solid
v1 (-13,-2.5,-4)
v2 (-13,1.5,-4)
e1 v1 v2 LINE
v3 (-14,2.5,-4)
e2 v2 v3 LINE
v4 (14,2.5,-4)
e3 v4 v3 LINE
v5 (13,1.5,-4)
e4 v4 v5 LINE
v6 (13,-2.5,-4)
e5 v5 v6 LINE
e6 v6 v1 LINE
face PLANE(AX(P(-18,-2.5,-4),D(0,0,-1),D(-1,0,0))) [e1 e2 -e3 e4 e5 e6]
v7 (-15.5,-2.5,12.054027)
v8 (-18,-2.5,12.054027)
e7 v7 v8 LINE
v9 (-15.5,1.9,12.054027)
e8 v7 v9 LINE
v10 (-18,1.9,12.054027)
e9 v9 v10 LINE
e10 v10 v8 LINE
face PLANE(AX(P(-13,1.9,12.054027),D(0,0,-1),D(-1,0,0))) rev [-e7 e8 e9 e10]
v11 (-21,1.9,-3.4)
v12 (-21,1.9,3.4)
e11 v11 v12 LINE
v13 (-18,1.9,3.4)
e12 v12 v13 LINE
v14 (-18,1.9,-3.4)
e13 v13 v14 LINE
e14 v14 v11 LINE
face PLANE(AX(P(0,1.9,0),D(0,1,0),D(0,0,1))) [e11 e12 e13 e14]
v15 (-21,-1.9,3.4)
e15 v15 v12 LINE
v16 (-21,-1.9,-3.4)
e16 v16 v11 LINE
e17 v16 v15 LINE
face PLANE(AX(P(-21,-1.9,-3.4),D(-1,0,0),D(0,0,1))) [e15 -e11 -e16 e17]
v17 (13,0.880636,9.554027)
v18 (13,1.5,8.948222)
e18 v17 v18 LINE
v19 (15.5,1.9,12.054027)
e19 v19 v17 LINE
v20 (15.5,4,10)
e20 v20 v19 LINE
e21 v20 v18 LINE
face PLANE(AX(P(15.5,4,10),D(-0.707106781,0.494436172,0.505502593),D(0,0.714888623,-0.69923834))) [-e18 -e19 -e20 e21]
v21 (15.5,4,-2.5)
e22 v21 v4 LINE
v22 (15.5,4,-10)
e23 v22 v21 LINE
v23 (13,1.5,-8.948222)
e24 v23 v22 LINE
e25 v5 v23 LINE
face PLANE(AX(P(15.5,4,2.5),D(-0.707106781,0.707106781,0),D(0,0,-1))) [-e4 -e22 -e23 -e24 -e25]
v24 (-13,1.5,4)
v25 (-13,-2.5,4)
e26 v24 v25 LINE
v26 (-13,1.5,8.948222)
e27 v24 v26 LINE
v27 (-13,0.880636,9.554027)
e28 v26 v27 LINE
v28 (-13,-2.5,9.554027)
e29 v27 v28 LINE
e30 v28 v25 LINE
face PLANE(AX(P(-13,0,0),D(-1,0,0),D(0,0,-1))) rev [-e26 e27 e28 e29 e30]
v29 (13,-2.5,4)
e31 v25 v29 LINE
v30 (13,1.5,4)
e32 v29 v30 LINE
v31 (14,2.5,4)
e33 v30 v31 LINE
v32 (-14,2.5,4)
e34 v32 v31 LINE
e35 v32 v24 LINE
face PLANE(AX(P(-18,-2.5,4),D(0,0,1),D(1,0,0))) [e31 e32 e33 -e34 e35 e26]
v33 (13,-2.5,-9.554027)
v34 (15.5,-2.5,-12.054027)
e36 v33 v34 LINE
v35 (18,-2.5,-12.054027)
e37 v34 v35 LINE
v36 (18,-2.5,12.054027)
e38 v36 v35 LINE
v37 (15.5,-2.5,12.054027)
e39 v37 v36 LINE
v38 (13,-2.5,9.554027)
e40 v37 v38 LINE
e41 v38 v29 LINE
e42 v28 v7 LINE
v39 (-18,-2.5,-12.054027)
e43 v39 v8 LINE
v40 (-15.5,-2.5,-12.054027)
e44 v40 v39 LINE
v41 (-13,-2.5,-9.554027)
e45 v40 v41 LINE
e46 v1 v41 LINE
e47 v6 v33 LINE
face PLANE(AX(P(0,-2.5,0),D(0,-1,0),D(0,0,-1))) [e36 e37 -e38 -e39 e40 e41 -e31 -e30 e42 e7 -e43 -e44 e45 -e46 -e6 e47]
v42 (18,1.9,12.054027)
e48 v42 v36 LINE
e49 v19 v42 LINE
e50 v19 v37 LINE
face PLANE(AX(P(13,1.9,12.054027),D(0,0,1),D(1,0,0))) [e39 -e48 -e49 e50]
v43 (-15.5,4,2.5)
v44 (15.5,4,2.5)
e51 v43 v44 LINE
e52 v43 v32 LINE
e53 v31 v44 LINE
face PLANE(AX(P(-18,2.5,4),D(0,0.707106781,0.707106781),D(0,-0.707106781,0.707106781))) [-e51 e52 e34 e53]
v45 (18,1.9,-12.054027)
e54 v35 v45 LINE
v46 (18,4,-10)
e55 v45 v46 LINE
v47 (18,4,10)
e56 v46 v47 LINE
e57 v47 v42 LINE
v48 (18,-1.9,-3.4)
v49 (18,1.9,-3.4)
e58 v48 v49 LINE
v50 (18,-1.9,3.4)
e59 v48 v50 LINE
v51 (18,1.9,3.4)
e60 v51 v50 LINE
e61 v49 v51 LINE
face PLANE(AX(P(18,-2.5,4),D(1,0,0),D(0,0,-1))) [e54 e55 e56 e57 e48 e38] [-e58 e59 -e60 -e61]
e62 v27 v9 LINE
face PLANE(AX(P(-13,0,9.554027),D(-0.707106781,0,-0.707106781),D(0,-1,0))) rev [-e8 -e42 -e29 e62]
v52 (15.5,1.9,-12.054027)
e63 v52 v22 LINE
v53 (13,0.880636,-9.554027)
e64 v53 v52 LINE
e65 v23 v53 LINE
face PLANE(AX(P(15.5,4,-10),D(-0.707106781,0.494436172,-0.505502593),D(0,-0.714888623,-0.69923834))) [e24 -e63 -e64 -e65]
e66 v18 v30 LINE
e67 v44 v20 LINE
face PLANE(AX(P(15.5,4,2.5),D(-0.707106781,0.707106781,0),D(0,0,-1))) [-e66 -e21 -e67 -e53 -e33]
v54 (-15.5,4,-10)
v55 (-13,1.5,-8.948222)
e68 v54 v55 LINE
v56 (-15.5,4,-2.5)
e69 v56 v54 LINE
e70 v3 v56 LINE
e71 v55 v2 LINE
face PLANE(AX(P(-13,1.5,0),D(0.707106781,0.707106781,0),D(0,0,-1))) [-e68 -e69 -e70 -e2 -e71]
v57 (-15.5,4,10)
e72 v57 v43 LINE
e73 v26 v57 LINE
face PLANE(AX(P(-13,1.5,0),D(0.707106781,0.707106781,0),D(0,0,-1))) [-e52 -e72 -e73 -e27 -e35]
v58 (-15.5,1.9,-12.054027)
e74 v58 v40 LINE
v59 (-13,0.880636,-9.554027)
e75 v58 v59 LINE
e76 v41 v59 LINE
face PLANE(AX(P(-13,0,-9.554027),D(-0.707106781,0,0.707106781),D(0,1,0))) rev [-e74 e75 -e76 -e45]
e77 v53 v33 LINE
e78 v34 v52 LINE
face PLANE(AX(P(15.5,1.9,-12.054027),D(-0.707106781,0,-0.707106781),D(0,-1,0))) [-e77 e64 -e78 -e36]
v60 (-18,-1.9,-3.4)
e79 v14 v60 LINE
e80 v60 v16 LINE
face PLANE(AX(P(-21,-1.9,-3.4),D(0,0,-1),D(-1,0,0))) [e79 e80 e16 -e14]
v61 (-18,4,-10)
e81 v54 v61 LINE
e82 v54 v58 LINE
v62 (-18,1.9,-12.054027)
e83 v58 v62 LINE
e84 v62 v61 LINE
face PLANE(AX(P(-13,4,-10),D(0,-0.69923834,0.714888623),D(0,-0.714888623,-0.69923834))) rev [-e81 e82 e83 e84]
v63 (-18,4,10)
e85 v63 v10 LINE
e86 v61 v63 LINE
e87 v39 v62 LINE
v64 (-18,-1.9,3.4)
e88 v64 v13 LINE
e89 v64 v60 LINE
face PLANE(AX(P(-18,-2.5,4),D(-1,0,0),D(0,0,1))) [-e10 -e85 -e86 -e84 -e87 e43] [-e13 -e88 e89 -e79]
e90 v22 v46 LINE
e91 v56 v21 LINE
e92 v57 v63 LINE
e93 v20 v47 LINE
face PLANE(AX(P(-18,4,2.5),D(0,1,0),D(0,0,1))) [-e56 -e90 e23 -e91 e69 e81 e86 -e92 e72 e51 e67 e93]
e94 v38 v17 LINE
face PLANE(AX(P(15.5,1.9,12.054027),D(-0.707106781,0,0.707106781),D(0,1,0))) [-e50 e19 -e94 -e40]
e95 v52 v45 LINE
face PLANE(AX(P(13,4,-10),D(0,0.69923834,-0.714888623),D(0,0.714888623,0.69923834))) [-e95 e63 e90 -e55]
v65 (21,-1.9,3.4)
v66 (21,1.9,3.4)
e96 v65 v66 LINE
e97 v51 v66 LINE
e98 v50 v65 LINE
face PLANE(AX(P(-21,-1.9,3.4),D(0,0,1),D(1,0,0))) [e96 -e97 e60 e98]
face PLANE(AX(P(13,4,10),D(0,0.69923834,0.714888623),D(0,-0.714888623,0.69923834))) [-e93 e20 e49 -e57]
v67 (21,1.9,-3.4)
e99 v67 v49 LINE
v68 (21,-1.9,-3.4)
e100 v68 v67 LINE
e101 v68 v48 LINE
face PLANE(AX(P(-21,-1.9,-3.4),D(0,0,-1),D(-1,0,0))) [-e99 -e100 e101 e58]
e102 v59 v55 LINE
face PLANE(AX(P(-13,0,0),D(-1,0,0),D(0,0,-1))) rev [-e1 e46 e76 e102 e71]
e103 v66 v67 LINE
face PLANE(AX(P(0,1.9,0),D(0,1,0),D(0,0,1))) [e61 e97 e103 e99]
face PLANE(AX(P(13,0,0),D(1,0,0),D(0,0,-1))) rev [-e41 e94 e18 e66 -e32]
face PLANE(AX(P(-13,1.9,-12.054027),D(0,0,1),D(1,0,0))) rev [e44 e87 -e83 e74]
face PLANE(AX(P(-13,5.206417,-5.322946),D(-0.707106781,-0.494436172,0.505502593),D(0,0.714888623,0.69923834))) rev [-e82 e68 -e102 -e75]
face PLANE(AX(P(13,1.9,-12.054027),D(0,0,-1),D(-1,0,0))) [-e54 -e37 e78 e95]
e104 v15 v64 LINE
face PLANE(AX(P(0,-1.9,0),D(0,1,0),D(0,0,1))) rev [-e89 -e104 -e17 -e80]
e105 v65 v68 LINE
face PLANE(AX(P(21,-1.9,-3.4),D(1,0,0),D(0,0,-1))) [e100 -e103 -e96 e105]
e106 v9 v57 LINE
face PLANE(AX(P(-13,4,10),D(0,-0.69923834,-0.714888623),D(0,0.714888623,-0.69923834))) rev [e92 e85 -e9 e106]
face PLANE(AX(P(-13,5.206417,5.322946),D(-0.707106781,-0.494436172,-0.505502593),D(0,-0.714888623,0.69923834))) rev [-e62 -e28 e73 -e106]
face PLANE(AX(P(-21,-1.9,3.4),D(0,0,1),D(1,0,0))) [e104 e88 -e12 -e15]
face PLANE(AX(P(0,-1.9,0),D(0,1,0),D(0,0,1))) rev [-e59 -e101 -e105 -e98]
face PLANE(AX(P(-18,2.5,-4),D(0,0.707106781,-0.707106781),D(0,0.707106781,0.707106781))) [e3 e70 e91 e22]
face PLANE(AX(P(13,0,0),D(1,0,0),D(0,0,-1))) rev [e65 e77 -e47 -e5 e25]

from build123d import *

# Parameters (mm, degrees)
BOSS_EXTRUDE1_DEPTH      = 2.5
BOSS_EXTRUDE1_DEPTH_BACK = 2.5
SKETCH1_W                = 36
SKETCH1_H                = 8
BOSS_EXTRUDE2_DEPTH      = 1.9
BOSS_EXTRUDE2_DEPTH_BACK = 1.9
SKETCH2_W                = 42
SKETCH2_H                = 6.8
BOSS_EXTRUDE4_DEPTH      = 18
BOSS_EXTRUDE4_DEPTH_BACK = 18
BOSS_EXTRUDE5_DEPTH      = 5
CHAMFER1_SIZE            = 2.5


with BuildPart() as part:
    # Sketch1 → Boss-Extrude1 (new, two sides: drawn at the far end of the back side and taken through both)
    with BuildSketch(Plane(origin=(0, 0, 0), x_dir=(1, 0, 0), z_dir=(0, 1, 0)).offset(-BOSS_EXTRUDE1_DEPTH_BACK)):
        Rectangle(SKETCH1_W, SKETCH1_H)
    extrude(amount=BOSS_EXTRUDE1_DEPTH + BOSS_EXTRUDE1_DEPTH_BACK)

    # Sketch2 → Boss-Extrude2 (add, two sides: drawn at the far end of the back side and taken through both)
    with BuildSketch(Plane(origin=(0, 0, 0), x_dir=(1, 0, 0), z_dir=(0, 1, 0)).offset(-BOSS_EXTRUDE2_DEPTH_BACK)):
        Rectangle(SKETCH2_W, SKETCH2_H)
    extrude(amount=BOSS_EXTRUDE2_DEPTH + BOSS_EXTRUDE2_DEPTH_BACK)

    # Sketch3 → Boss-Extrude4 (add, two sides: drawn at the far end of the back side and taken through both)
    with BuildSketch(Plane(origin=(0, 0, 0), x_dir=(0, 0, -1), z_dir=(1, 0, 0)).offset(-BOSS_EXTRUDE4_DEPTH_BACK)):
        Polygon((-4, 2.5), (-2.5, 4), (2.5, 4), (4, 2.5), align=None)
    extrude(amount=BOSS_EXTRUDE4_DEPTH + BOSS_EXTRUDE4_DEPTH_BACK)

    # Sketch4 → Boss-Extrude5 (add)
    with BuildSketch(Plane(origin=(18, 0, 0), x_dir=(0, 0, -1), z_dir=(1, 0, 0))):
        Polygon((10, 4), (-10, 4), (-12.054026971, 1.9), (-12.054026971, -2.5), (12.054026971, -2.5), (12.054026971, 1.9), align=None)
    boss_extrude5 = extrude(amount=-BOSS_EXTRUDE5_DEPTH)

    # Mirror1: Boss-Extrude5 across plane
    add(boss_extrude5.mirror(Plane(origin=(0, 0, 0), x_dir=(0, 0, 1), z_dir=(1, 0, 0))))

    # Chamfer1
    # the kernel refuses this chamfer: 2.5 mm, written as the material it takes off along each edge
    with BuildSketch(Plane(origin=(13, -8.92920747, -12.054026971), x_dir=(-0.027495876610586317, 0, 0.9996219169112968), z_dir=(0, 1, 0)), Plane(origin=(13, 8.32920747, 12.054026971), x_dir=(-0.027495876610586317, 0, -0.9996219169112968), z_dir=(0, -1, 0))) as chamfer1_piece_1:
        Polygon((CHAMFER1_SIZE * 0.999621916911, CHAMFER1_SIZE * 0.0274958766106), (-CHAMFER1_SIZE * 0.0274958766106, CHAMFER1_SIZE * 0.999621916911), (0, 0), align=None)
    extrude(amount=17.25841494, mode=Mode.SUBTRACT)
    with BuildSketch(Plane(origin=(13, 4, -16.42920747), x_dir=(-0.027495876610586317, -0.9996219169112968, 0), z_dir=(0, 0, 1))) as chamfer1_piece_2_section:
        Polygon((CHAMFER1_SIZE * 0.999621916911, CHAMFER1_SIZE * 0.0274958766106), (-CHAMFER1_SIZE * 0.0274958766106, CHAMFER1_SIZE * 0.999621916911), (0, 0), align=None)
    chamfer1_piece_2 = extrude(amount=20.35841494, mode=Mode.PRIVATE)
    chamfer1_piece_2 = split(chamfer1_piece_2, bisect_by=Plane(origin=(13.827805958, -0.281636431, -6.781636431), z_dir=(0, 0.7071067811865474, -0.7071067811865478)), keep=Keep.TOP, mode=Mode.PRIVATE)
    chamfer1_piece_2 = split(chamfer1_piece_2, bisect_by=Plane(origin=(13.827805958, 3.181857543, -4), z_dir=(0, 0, -1)), keep=Keep.TOP, mode=Mode.PRIVATE)
    add(chamfer1_piece_2, mode=Mode.SUBTRACT)
    with BuildSketch(Plane(origin=(13, 4, -16.42920747), x_dir=(-0.027495876610586317, -0.9996219169112968, 0), z_dir=(0, 0, 1))) as chamfer1_piece_3_section:
        Polygon((CHAMFER1_SIZE * 0.999621916911, CHAMFER1_SIZE * 0.0274958766106), (-CHAMFER1_SIZE * 0.0274958766106, CHAMFER1_SIZE * 0.999621916911), (0, 0), align=None)
    chamfer1_piece_3 = extrude(amount=20.35841494, mode=Mode.PRIVATE)
    chamfer1_piece_3 = split(chamfer1_piece_3, bisect_by=Plane(origin=(14.055981956, 3.329802403, -3.170197597), z_dir=(0, 0.7071067811865474, -0.7071067811865478)), keep=Keep.TOP, mode=Mode.PRIVATE)
    chamfer1_piece_3 = split(chamfer1_piece_3, bisect_by=Plane(origin=(14.055981956, 3.606403204, -4), z_dir=(0, 0, 1)), keep=Keep.TOP, mode=Mode.PRIVATE)
    add(chamfer1_piece_3, mode=Mode.SUBTRACT)
    with BuildSketch(Plane(origin=(13, 4, -16.42920747), x_dir=(-0.027495876610586317, -0.9996219169112968, 0), z_dir=(0, 0, 1))) as chamfer1_piece_4_section:
        Polygon((CHAMFER1_SIZE * 0.999621916911, CHAMFER1_SIZE * 0.0274958766106), (-CHAMFER1_SIZE * 0.0274958766106, CHAMFER1_SIZE * 0.999621916911), (0, 0), align=None)
    chamfer1_piece_4 = extrude(amount=20.35841494, mode=Mode.PRIVATE)
    chamfer1_piece_4 = split(chamfer1_piece_4, bisect_by=Plane(origin=(13.178553406, 2.081808313, -4.418191687), z_dir=(0, -0.7071067811865474, 0.7071067811865478)), keep=Keep.TOP, mode=Mode.PRIVATE)
    chamfer1_piece_4 = split(chamfer1_piece_4, bisect_by=Plane(origin=(13.178553406, 1.942411084, -4), z_dir=(0, 0, -1)), keep=Keep.TOP, mode=Mode.PRIVATE)
    add(chamfer1_piece_4, mode=Mode.SUBTRACT)
    with BuildSketch(Plane(origin=(13, 4, -16.42920747), x_dir=(-0.027495876610586317, -0.9996219169112968, 0), z_dir=(0, 0, 1))) as chamfer1_piece_5_section:
        Polygon((CHAMFER1_SIZE * 0.999621916911, CHAMFER1_SIZE * 0.0274958766106), (-CHAMFER1_SIZE * 0.0274958766106, CHAMFER1_SIZE * 0.999621916911), (0, 0), align=None)
    chamfer1_piece_5 = extrude(amount=20.35841494, mode=Mode.PRIVATE)
    chamfer1_piece_5 = split(chamfer1_piece_5, bisect_by=Plane(origin=(14.06552613, 3.360440838, 3.139559162), z_dir=(0, 0.7071067811865476, 0.7071067811865476)), keep=Keep.TOP, mode=Mode.PRIVATE)
    add(chamfer1_piece_5, mode=Mode.SUBTRACT)
    with BuildSketch(Plane(origin=(13, 4, -3.92920747), x_dir=(-0.027495876610586317, -0.9996219169112968, 0), z_dir=(0, 0, 1))) as chamfer1_piece_6_section:
        Polygon((CHAMFER1_SIZE * 0.999621916911, CHAMFER1_SIZE * 0.0274958766106), (-CHAMFER1_SIZE * 0.0274958766106, CHAMFER1_SIZE * 0.999621916911), (0, 0), align=None)
    chamfer1_piece_6 = extrude(amount=20.35841494, mode=Mode.PRIVATE)
    chamfer1_piece_6 = split(chamfer1_piece_6, bisect_by=Plane(origin=(14.06552613, 3.360440838, -3.139559162), z_dir=(0, 0.7071067811865474, -0.7071067811865478)), keep=Keep.TOP, mode=Mode.PRIVATE)
    add(chamfer1_piece_6, mode=Mode.SUBTRACT)
    with BuildSketch(Plane(origin=(13, 4, -3.92920747), x_dir=(-0.027495876610586317, -0.9996219169112968, 0), z_dir=(0, 0, 1))) as chamfer1_piece_7_section:
        Polygon((CHAMFER1_SIZE * 0.999621916911, CHAMFER1_SIZE * 0.0274958766106), (-CHAMFER1_SIZE * 0.0274958766106, CHAMFER1_SIZE * 0.999621916911), (0, 0), align=None)
    chamfer1_piece_7 = extrude(amount=20.35841494, mode=Mode.PRIVATE)
    chamfer1_piece_7 = split(chamfer1_piece_7, bisect_by=Plane(origin=(14.055981956, 3.329802403, 3.170197597), z_dir=(0, 0.7071067811865476, 0.7071067811865476)), keep=Keep.TOP, mode=Mode.PRIVATE)
    chamfer1_piece_7 = split(chamfer1_piece_7, bisect_by=Plane(origin=(14.055981956, 3.606403204, 4), z_dir=(0, 0, -1)), keep=Keep.TOP, mode=Mode.PRIVATE)
    add(chamfer1_piece_7, mode=Mode.SUBTRACT)
    with BuildSketch(Plane(origin=(13, 4, -3.92920747), x_dir=(-0.027495876610586317, -0.9996219169112968, 0), z_dir=(0, 0, 1))) as chamfer1_piece_8_section:
        Polygon((CHAMFER1_SIZE * 0.999621916911, CHAMFER1_SIZE * 0.0274958766106), (-CHAMFER1_SIZE * 0.0274958766106, CHAMFER1_SIZE * 0.999621916911), (0, 0), align=None)
    chamfer1_piece_8 = extrude(amount=20.35841494, mode=Mode.PRIVATE)
    chamfer1_piece_8 = split(chamfer1_piece_8, bisect_by=Plane(origin=(13.178553406, 2.081808313, 4.418191687), z_dir=(0, -0.7071067811865476, -0.7071067811865476)), keep=Keep.TOP, mode=Mode.PRIVATE)
    chamfer1_piece_8 = split(chamfer1_piece_8, bisect_by=Plane(origin=(13.178553406, 1.942411084, 4), z_dir=(0, 0, 1)), keep=Keep.TOP, mode=Mode.PRIVATE)
    add(chamfer1_piece_8, mode=Mode.SUBTRACT)
    with BuildSketch(Plane(origin=(13, 4, -3.92920747), x_dir=(-0.027495876610586317, -0.9996219169112968, 0), z_dir=(0, 0, 1))) as chamfer1_piece_9_section:
        Polygon((CHAMFER1_SIZE * 0.999621916911, CHAMFER1_SIZE * 0.0274958766106), (-CHAMFER1_SIZE * 0.0274958766106, CHAMFER1_SIZE * 0.999621916911), (0, 0), align=None)
    chamfer1_piece_9 = extrude(amount=20.35841494, mode=Mode.PRIVATE)
    chamfer1_piece_9 = split(chamfer1_piece_9, bisect_by=Plane(origin=(13.827805958, -0.281636431, 6.781636431), z_dir=(0, 0.7071067811865476, 0.7071067811865476)), keep=Keep.TOP, mode=Mode.PRIVATE)
    chamfer1_piece_9 = split(chamfer1_piece_9, bisect_by=Plane(origin=(13.827805958, 3.181857543, 4), z_dir=(0, 0, 1)), keep=Keep.TOP, mode=Mode.PRIVATE)
    add(chamfer1_piece_9, mode=Mode.SUBTRACT)
    with BuildSketch(Plane(origin=(-13, -8.92920747, -12.054026971), x_dir=(0.027495876610586317, 0, 0.9996219169112968), z_dir=(0, 1, 0)), Plane(origin=(-13, 8.32920747, 12.054026971), x_dir=(0.027495876610586317, 0, -0.9996219169112968), z_dir=(0, -1, 0))) as chamfer1_piece_10:
        Polygon((CHAMFER1_SIZE * 0.999621916911, -CHAMFER1_SIZE * 0.0274958766106), (-CHAMFER1_SIZE * 0.0274958766106, -CHAMFER1_SIZE * 0.999621916911), (0, 0), align=None)
    extrude(amount=17.25841494, mode=Mode.SUBTRACT)
    with BuildSketch(Plane(origin=(-13, 4, -16.42920747), x_dir=(0.027495876610586317, -0.9996219169112968, 0), z_dir=(0, 0, 1))) as chamfer1_piece_11_section:
        Polygon((CHAMFER1_SIZE * 0.999621916911, -CHAMFER1_SIZE * 0.0274958766106), (-CHAMFER1_SIZE * 0.0274958766106, -CHAMFER1_SIZE * 0.999621916911), (0, 0), align=None)
    chamfer1_piece_11 = extrude(amount=20.35841494, mode=Mode.PRIVATE)
    chamfer1_piece_11 = split(chamfer1_piece_11, bisect_by=Plane(origin=(-13.827805958, 3.181857543, -4), z_dir=(0, 0, -1)), keep=Keep.TOP, mode=Mode.PRIVATE)
    chamfer1_piece_11 = split(chamfer1_piece_11, bisect_by=Plane(origin=(-13.827805958, -0.281636431, -6.781636431), z_dir=(0, 0.7071067811865474, -0.7071067811865478)), keep=Keep.TOP, mode=Mode.PRIVATE)
    add(chamfer1_piece_11, mode=Mode.SUBTRACT)
    with BuildSketch(Plane(origin=(-13, 4, -16.42920747), x_dir=(0.027495876610586317, -0.9996219169112968, 0), z_dir=(0, 0, 1))) as chamfer1_piece_12_section:
        Polygon((CHAMFER1_SIZE * 0.999621916911, -CHAMFER1_SIZE * 0.0274958766106), (-CHAMFER1_SIZE * 0.0274958766106, -CHAMFER1_SIZE * 0.999621916911), (0, 0), align=None)
    chamfer1_piece_12 = extrude(amount=20.35841494, mode=Mode.PRIVATE)
    chamfer1_piece_12 = split(chamfer1_piece_12, bisect_by=Plane(origin=(-14.055981956, 3.606403204, -4), z_dir=(0, 0, 1)), keep=Keep.TOP, mode=Mode.PRIVATE)
    chamfer1_piece_12 = split(chamfer1_piece_12, bisect_by=Plane(origin=(-14.055981956, 3.329802403, -3.170197597), z_dir=(0, 0.7071067811865474, -0.7071067811865478)), keep=Keep.TOP, mode=Mode.PRIVATE)
    add(chamfer1_piece_12, mode=Mode.SUBTRACT)
    with BuildSketch(Plane(origin=(-13, 4, -16.42920747), x_dir=(0.027495876610586317, -0.9996219169112968, 0), z_dir=(0, 0, 1))) as chamfer1_piece_13_section:
        Polygon((CHAMFER1_SIZE * 0.999621916911, -CHAMFER1_SIZE * 0.0274958766106), (-CHAMFER1_SIZE * 0.0274958766106, -CHAMFER1_SIZE * 0.999621916911), (0, 0), align=None)
    chamfer1_piece_13 = extrude(amount=20.35841494, mode=Mode.PRIVATE)
    chamfer1_piece_13 = split(chamfer1_piece_13, bisect_by=Plane(origin=(-13.178553406, 1.942411084, -4), z_dir=(0, 0, -1)), keep=Keep.TOP, mode=Mode.PRIVATE)
    chamfer1_piece_13 = split(chamfer1_piece_13, bisect_by=Plane(origin=(-13.178553406, 2.081808313, -4.418191687), z_dir=(0, -0.7071067811865474, 0.7071067811865478)), keep=Keep.TOP, mode=Mode.PRIVATE)
    add(chamfer1_piece_13, mode=Mode.SUBTRACT)
    with BuildSketch(Plane(origin=(-13, 4, -16.42920747), x_dir=(0.027495876610586317, -0.9996219169112968, 0), z_dir=(0, 0, 1))) as chamfer1_piece_14_section:
        Polygon((CHAMFER1_SIZE * 0.999621916911, -CHAMFER1_SIZE * 0.0274958766106), (-CHAMFER1_SIZE * 0.0274958766106, -CHAMFER1_SIZE * 0.999621916911), (0, 0), align=None)
    chamfer1_piece_14 = extrude(amount=20.35841494, mode=Mode.PRIVATE)
    chamfer1_piece_14 = split(chamfer1_piece_14, bisect_by=Plane(origin=(-14.06552613, 3.360440838, 3.139559162), z_dir=(0, 0.7071067811865476, 0.7071067811865476)), keep=Keep.TOP, mode=Mode.PRIVATE)
    add(chamfer1_piece_14, mode=Mode.SUBTRACT)
    with BuildSketch(Plane(origin=(-13, 4, -3.92920747), x_dir=(0.027495876610586317, -0.9996219169112968, 0), z_dir=(0, 0, 1))) as chamfer1_piece_15_section:
        Polygon((CHAMFER1_SIZE * 0.999621916911, -CHAMFER1_SIZE * 0.0274958766106), (-CHAMFER1_SIZE * 0.0274958766106, -CHAMFER1_SIZE * 0.999621916911), (0, 0), align=None)
    chamfer1_piece_15 = extrude(amount=20.35841494, mode=Mode.PRIVATE)
    chamfer1_piece_15 = split(chamfer1_piece_15, bisect_by=Plane(origin=(-14.06552613, 3.360440838, -3.139559162), z_dir=(0, 0.7071067811865474, -0.7071067811865478)), keep=Keep.TOP, mode=Mode.PRIVATE)
    add(chamfer1_piece_15, mode=Mode.SUBTRACT)
    with BuildSketch(Plane(origin=(-13, 4, -3.92920747), x_dir=(0.027495876610586317, -0.9996219169112968, 0), z_dir=(0, 0, 1))) as chamfer1_piece_16_section:
        Polygon((CHAMFER1_SIZE * 0.999621916911, -CHAMFER1_SIZE * 0.0274958766106), (-CHAMFER1_SIZE * 0.0274958766106, -CHAMFER1_SIZE * 0.999621916911), (0, 0), align=None)
    chamfer1_piece_16 = extrude(amount=20.35841494, mode=Mode.PRIVATE)
    chamfer1_piece_16 = split(chamfer1_piece_16, bisect_by=Plane(origin=(-14.055981956, 3.606403204, 4), z_dir=(0, 0, -1)), keep=Keep.TOP, mode=Mode.PRIVATE)
    chamfer1_piece_16 = split(chamfer1_piece_16, bisect_by=Plane(origin=(-14.055981956, 3.329802403, 3.170197597), z_dir=(0, 0.7071067811865476, 0.7071067811865476)), keep=Keep.TOP, mode=Mode.PRIVATE)
    add(chamfer1_piece_16, mode=Mode.SUBTRACT)
    with BuildSketch(Plane(origin=(-13, 4, -3.92920747), x_dir=(0.027495876610586317, -0.9996219169112968, 0), z_dir=(0, 0, 1))) as chamfer1_piece_17_section:
        Polygon((CHAMFER1_SIZE * 0.999621916911, -CHAMFER1_SIZE * 0.0274958766106), (-CHAMFER1_SIZE * 0.0274958766106, -CHAMFER1_SIZE * 0.999621916911), (0, 0), align=None)
    chamfer1_piece_17 = extrude(amount=20.35841494, mode=Mode.PRIVATE)
    chamfer1_piece_17 = split(chamfer1_piece_17, bisect_by=Plane(origin=(-13.178553406, 1.942411084, 4), z_dir=(0, 0, 1)), keep=Keep.TOP, mode=Mode.PRIVATE)
    chamfer1_piece_17 = split(chamfer1_piece_17, bisect_by=Plane(origin=(-13.178553406, 2.081808313, 4.418191687), z_dir=(0, -0.7071067811865476, -0.7071067811865476)), keep=Keep.TOP, mode=Mode.PRIVATE)
    add(chamfer1_piece_17, mode=Mode.SUBTRACT)
    with BuildSketch(Plane(origin=(-13, 4, -3.92920747), x_dir=(0.027495876610586317, -0.9996219169112968, 0), z_dir=(0, 0, 1))) as chamfer1_piece_18_section:
        Polygon((CHAMFER1_SIZE * 0.999621916911, -CHAMFER1_SIZE * 0.0274958766106), (-CHAMFER1_SIZE * 0.0274958766106, -CHAMFER1_SIZE * 0.999621916911), (0, 0), align=None)
    chamfer1_piece_18 = extrude(amount=20.35841494, mode=Mode.PRIVATE)
    chamfer1_piece_18 = split(chamfer1_piece_18, bisect_by=Plane(origin=(-13.827805958, 3.181857543, 4), z_dir=(0, 0, 1)), keep=Keep.TOP, mode=Mode.PRIVATE)
    chamfer1_piece_18 = split(chamfer1_piece_18, bisect_by=Plane(origin=(-13.827805958, -0.281636431, 6.781636431), z_dir=(0, 0.7071067811865476, 0.7071067811865476)), keep=Keep.TOP, mode=Mode.PRIVATE)
    add(chamfer1_piece_18, mode=Mode.SUBTRACT)
    with BuildSketch(Plane(origin=(13, -2.696167278, -16.54957533), x_dir=(-0.027495876610586303, -0.6989739698056905, 0.7146183361092052), z_dir=(0, 0.7148886234080223, 0.6992383399970165)), Plane(origin=(-13, -2.696167278, -16.54957533), x_dir=(-0.9996219169112968, 0.01922617111794918, -0.019656489379538903), z_dir=(0, 0.7148886234080223, 0.6992383399970165))) as chamfer1_piece_19:
        Polygon((CHAMFER1_SIZE * 0.999621916911, CHAMFER1_SIZE * 0.0274958766106), (-CHAMFER1_SIZE * 0.0274958766106, CHAMFER1_SIZE * 0.999621916911), (0, 0), align=None)
    extrude(amount=15.795935459, mode=Mode.SUBTRACT)
    with BuildSketch(Plane(origin=(13, 8.596167278, 5.504451641), x_dir=(0.9996219169112968, 0.01922617111794934, 0.019656489379539066), z_dir=(0, -0.7148886234080223, 0.6992383399970165)), Plane(origin=(-13, 8.596167278, 5.504451641), x_dir=(0.02749587661058631, -0.6989739698056905, -0.7146183361092052), z_dir=(0, -0.7148886234080223, 0.6992383399970165))) as chamfer1_piece_20:
        Polygon((CHAMFER1_SIZE * 0.999621916911, -CHAMFER1_SIZE * 0.0274958766106), (-CHAMFER1_SIZE * 0.0274958766106, -CHAMFER1_SIZE * 0.999621916911), (0, 0), align=None)
    extrude(amount=15.795935459, mode=Mode.SUBTRACT)


solid = part.part
